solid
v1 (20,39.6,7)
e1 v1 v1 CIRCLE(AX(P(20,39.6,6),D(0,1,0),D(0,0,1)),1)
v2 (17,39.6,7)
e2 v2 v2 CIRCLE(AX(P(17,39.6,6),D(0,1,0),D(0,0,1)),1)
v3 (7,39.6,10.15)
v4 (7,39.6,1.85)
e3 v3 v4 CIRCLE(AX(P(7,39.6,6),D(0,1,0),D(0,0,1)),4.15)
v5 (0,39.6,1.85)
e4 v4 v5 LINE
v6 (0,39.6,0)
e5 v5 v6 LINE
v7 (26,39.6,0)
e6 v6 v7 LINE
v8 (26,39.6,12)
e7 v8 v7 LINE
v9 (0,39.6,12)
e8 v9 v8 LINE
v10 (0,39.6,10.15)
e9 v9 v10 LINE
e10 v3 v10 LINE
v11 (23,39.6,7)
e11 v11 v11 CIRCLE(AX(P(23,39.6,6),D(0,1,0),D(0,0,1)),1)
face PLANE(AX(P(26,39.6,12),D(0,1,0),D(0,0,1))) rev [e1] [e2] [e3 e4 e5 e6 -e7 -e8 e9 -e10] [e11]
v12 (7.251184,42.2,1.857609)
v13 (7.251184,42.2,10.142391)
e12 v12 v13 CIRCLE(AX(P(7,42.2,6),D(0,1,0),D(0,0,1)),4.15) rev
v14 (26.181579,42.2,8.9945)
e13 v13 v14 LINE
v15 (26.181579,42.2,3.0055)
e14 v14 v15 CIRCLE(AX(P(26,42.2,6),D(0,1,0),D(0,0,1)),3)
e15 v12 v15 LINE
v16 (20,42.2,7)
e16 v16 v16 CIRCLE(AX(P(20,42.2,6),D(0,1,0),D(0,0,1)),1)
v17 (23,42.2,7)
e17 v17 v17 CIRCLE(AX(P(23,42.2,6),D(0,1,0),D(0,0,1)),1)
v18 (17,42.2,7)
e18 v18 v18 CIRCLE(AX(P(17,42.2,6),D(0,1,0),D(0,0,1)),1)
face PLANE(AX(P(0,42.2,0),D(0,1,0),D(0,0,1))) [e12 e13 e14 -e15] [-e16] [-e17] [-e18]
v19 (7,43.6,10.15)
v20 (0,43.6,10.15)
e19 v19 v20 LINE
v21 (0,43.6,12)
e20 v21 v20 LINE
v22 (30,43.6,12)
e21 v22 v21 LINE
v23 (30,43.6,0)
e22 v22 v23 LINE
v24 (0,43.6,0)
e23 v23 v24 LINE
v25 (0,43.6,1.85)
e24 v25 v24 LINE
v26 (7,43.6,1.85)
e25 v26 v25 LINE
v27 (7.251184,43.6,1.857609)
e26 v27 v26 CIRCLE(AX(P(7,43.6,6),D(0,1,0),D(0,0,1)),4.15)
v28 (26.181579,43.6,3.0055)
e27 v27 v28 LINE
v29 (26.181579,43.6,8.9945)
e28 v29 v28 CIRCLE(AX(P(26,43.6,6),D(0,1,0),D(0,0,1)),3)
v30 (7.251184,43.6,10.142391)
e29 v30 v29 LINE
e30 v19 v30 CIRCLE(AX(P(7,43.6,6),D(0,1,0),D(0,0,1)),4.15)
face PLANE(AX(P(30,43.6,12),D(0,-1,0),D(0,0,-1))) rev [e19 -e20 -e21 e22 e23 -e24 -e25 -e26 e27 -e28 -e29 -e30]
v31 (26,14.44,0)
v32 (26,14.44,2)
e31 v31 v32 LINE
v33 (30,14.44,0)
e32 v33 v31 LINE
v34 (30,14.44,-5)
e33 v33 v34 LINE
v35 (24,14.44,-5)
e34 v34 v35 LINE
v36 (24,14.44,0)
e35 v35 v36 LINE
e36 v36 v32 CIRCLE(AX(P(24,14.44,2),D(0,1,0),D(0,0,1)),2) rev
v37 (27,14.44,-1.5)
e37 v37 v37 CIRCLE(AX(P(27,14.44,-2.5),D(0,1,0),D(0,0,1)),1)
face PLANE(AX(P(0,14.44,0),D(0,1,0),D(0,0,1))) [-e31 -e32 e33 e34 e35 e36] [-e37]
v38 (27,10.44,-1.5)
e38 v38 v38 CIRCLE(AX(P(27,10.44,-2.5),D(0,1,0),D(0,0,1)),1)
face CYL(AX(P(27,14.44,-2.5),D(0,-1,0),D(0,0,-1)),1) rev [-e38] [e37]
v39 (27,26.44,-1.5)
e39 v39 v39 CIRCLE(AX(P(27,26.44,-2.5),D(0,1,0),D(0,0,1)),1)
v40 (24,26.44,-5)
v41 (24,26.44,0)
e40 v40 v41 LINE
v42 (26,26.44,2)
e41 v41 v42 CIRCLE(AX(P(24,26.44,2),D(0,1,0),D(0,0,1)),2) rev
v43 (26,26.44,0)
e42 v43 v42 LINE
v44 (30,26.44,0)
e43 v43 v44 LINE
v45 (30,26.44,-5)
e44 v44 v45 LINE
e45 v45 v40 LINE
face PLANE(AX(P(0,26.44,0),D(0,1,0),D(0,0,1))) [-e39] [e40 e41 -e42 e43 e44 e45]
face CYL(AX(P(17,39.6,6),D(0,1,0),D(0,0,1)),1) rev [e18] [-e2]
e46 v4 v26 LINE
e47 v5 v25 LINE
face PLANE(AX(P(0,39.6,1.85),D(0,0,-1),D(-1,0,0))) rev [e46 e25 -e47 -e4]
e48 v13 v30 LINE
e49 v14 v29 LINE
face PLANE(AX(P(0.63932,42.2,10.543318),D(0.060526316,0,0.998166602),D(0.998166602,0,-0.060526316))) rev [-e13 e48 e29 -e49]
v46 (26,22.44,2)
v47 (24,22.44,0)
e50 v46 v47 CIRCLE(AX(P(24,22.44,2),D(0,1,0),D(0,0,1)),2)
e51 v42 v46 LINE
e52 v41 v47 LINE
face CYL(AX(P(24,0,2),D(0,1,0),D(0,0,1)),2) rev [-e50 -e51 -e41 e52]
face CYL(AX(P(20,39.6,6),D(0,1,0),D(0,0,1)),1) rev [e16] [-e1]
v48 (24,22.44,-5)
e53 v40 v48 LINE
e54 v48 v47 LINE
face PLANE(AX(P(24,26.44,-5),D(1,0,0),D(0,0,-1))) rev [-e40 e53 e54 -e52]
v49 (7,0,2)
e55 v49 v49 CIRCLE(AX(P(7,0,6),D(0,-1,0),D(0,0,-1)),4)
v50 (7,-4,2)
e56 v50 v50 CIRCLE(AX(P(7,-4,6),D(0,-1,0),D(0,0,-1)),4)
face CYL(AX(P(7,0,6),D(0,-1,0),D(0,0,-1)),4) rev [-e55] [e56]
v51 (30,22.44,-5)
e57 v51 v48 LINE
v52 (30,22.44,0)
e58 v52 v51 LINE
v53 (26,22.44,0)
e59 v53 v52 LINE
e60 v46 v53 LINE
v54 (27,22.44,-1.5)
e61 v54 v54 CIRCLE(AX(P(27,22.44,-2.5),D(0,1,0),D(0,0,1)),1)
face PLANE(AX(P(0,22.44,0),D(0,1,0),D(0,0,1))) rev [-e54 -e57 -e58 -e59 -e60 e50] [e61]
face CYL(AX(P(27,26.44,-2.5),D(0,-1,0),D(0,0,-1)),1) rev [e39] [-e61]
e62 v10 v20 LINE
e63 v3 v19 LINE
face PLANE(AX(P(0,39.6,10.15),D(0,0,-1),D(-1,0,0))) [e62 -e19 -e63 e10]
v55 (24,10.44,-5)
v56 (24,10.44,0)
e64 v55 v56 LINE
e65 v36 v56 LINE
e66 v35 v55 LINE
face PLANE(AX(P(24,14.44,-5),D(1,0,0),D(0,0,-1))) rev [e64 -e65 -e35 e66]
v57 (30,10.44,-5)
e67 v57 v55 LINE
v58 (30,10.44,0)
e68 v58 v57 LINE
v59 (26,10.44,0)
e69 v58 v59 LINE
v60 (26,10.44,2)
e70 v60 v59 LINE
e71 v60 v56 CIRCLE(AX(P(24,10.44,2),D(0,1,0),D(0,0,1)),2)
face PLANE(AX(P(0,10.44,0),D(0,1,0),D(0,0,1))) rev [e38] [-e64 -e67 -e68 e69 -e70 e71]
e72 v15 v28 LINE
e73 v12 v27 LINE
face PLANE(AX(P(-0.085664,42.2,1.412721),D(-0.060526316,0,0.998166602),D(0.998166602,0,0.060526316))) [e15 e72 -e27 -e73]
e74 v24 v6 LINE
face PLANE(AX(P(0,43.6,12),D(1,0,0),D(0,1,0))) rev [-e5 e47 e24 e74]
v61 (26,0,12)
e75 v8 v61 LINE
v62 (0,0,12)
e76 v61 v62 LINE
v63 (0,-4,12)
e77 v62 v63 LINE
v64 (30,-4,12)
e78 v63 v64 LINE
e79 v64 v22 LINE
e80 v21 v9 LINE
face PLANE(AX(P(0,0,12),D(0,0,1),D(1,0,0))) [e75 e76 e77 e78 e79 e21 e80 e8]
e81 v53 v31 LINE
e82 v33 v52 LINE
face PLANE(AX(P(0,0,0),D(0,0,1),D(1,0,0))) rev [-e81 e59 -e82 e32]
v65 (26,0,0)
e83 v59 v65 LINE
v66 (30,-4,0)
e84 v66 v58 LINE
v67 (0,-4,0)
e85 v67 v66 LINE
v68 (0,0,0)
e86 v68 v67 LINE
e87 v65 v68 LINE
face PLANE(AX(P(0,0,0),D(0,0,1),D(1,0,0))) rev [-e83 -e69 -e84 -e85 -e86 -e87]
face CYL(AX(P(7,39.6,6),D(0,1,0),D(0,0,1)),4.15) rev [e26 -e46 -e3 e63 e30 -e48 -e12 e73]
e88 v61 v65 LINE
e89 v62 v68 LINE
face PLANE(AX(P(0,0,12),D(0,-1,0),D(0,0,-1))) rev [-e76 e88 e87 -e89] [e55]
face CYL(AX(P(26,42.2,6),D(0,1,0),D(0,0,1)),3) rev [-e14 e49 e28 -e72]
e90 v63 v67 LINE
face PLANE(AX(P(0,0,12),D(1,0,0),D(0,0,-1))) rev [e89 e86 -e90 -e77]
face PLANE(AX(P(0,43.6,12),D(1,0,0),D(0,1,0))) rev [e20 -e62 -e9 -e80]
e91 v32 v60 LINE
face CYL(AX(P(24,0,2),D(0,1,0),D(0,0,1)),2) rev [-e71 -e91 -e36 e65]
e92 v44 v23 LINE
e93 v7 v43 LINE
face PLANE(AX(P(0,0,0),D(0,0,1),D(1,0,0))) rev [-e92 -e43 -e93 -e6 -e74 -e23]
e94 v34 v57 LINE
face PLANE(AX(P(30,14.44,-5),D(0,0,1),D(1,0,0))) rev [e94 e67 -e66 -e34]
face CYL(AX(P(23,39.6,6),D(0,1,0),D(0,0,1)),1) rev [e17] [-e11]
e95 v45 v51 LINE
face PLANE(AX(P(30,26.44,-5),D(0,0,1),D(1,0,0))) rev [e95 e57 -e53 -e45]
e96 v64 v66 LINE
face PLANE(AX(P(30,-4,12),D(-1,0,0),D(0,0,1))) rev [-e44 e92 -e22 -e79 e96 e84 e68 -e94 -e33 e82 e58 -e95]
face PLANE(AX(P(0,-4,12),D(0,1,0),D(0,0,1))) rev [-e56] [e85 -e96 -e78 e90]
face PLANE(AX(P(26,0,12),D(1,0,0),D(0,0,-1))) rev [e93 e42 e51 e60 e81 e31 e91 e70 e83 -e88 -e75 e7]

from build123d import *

# Parameters (mm, degrees)
EXTRUDE_1_DEPTH     = 12
SKETCH_2_R          = 4
CUT_EXTRUDE_1_DEPTH = 4
CUT_EXTRUDE_2_DEPTH = 4
SKETCH_4_R          = 1
CUT_EXTRUDE_3_DEPTH = 1.4
CUT_EXTRUDE_4_DEPTH = 4
EXTRUDE_START       = 6
SKETCH_5_W          = 6
SKETCH_5_H          = 5
SKETCH_5_R          = 1
EXTRUDE_2_DEPTH     = 4
EXTRUDE_START_2     = -6
SKETCH_5_2_W        = 6
SKETCH_5_2_H        = 5
SKETCH_5_2_R        = 1
EXTRUDE_3_DEPTH     = 4
FILLET_1_R          = 2


with BuildPart() as part:
    # 草图1 → 凸台-拉伸1 (new body)
    with BuildSketch(Plane.XY):
        Polygon((0, 0), (26, 0), (26, 39.6), (0, 39.6), (0, 43.6), (30, 43.6), (30, -4), (0, -4), align=None)
    extrude(amount=EXTRUDE_1_DEPTH)

    # 草图2 → 切除-拉伸1 (cut)
    with BuildSketch(Plane.XZ.offset(4)):
        with Locations(Location((7, 6, 0), (0, 0, 270))):
            Circle(SKETCH_2_R)
    extrude(amount=-CUT_EXTRUDE_1_DEPTH, mode=Mode.SUBTRACT)

    # 草图3 → 切除-拉伸2 (cut)
    with BuildSketch(Plane(origin=(0, 43.6, 0), x_dir=(1, 0, 0), z_dir=(0, 1, 0))):
        with BuildLine():
            Line((0, -1.85), (0, -10.15))
            Line((0, -10.15), (7, -10.15))
            ThreePointArc((7, -10.15), (11.15, -6), (7, -1.85))
            Line((7, -1.85), (0, -1.85))
        make_face()
    extrude(amount=-CUT_EXTRUDE_2_DEPTH, mode=Mode.SUBTRACT)

    # 草图4 → 切除-拉伸3 (cut)
    with BuildSketch(Plane(origin=(0, 43.6, 0), x_dir=(1, 0, 0), z_dir=(0, 1, 0))):
        with BuildLine():
            ThreePointArc((7.251184211, -1.857608602), (11.15, -6), (7.251184211, -10.142391398))
            Line((7.251184211, -10.142391398), (26.181578947, -8.994499806))
            ThreePointArc((26.181578947, -8.994499806), (29, -6), (26.181578947, -3.005500194))
            Line((26.181578947, -3.005500194), (7.251184211, -1.857608602))
        make_face()
        with Locations(Location((23, -6, 0), (0, 0, 270))):
            Circle(SKETCH_4_R, mode=Mode.SUBTRACT)
        with Locations(Location((20, -6, 0), (0, 0, 270))):
            Circle(SKETCH_4_R, mode=Mode.SUBTRACT)
        with Locations(Location((17, -6, 0), (0, 0, 270))):
            Circle(SKETCH_4_R, mode=Mode.SUBTRACT)
    extrude(amount=-CUT_EXTRUDE_3_DEPTH, mode=Mode.SUBTRACT)

    # 草图4<3> → 切除-拉伸4 (cut)
    with BuildSketch(Plane(origin=(0, 43.6, 0), x_dir=(1, 0, 0), z_dir=(0, 1, 0))):
        with BuildLine():
            ThreePointArc((23, -6), (23.041960108, -6.5), (23.166666667, -6.986013297))
            ThreePointArc((23.166666667, -6.986013297), (23.763762616, -6.645497224), (24, -6))
            Line((24, -6), (23, -6))
        make_face()
        with BuildLine():
            ThreePointArc((22, -6), (22.354502776, -6.763762616), (23.166666667, -6.986013297))
            ThreePointArc((23.166666667, -6.986013297), (23.041960108, -6.5), (23, -6))
            Line((23, -6), (22, -6))
        make_face()
        with BuildLine():
            ThreePointArc((23, -6), (23.041960108, -5.5), (23.166666667, -5.013986703))
            ThreePointArc((23.166666667, -5.013986703), (22.354502776, -5.236237384), (22, -6))
            Line((22, -6), (23, -6))
        make_face()
        with BuildLine():
            ThreePointArc((24, -6), (23.763762616, -5.354502776), (23.166666667, -5.013986703))
            ThreePointArc((23.166666667, -5.013986703), (23.041960108, -5.5), (23, -6))
            Line((23, -6), (24, -6))
        make_face()
        with BuildLine():
            ThreePointArc((21, -6), (20, -5), (19, -6))
            Line((19, -6), (21, -6))
        make_face()
        with BuildLine():
            Line((21, -6), (19, -6))
            ThreePointArc((19, -6), (20, -7), (21, -6))
        make_face()
        with BuildLine():
            ThreePointArc((18, -6), (17, -5), (16, -6))
            Line((16, -6), (18, -6))
        make_face()
        with BuildLine():
            Line((18, -6), (16, -6))
            ThreePointArc((16, -6), (17, -7), (18, -6))
        make_face()
    extrude(amount=-CUT_EXTRUDE_4_DEPTH, mode=Mode.SUBTRACT)

    # 草图5 → 凸台-拉伸2 (add)
    with BuildSketch(Plane(origin=(0, 16.44, 0), x_dir=(1, 0, 0), z_dir=(0, 1, 0)).offset(EXTRUDE_START)):
        with Locations((27, 2.5)):
            Rectangle(SKETCH_5_W, SKETCH_5_H)
        with Locations(Location((27, 2.5, 0), (0, 0, 270))):
            Circle(SKETCH_5_R, mode=Mode.SUBTRACT)
    extrude(amount=EXTRUDE_2_DEPTH)

    # 草图5<2> → 凸台-拉伸3 (add)
    with BuildSketch(Plane(origin=(0, 16.44, 0), x_dir=(1, 0, 0), z_dir=(0, 1, 0)).offset(EXTRUDE_START_2)):
        with Locations((27, 2.5)):
            Rectangle(SKETCH_5_2_W, SKETCH_5_2_H)
        with Locations(Location((27, 2.5, 0), (0, 0, 270))):
            Circle(SKETCH_5_2_R, mode=Mode.SUBTRACT)
    extrude(amount=EXTRUDE_3_DEPTH)

    # 圆角1
    fillet_1_edges = [part.edges().sort_by_distance(p)[0] for p in [
        (26, 12.44, 0),
        (26, 24.44, 0),
    ]]
    fillet(fillet_1_edges, radius=FILLET_1_R - 0.0001)  # a hair under: the kernel refuses the full size


solid = part.part
